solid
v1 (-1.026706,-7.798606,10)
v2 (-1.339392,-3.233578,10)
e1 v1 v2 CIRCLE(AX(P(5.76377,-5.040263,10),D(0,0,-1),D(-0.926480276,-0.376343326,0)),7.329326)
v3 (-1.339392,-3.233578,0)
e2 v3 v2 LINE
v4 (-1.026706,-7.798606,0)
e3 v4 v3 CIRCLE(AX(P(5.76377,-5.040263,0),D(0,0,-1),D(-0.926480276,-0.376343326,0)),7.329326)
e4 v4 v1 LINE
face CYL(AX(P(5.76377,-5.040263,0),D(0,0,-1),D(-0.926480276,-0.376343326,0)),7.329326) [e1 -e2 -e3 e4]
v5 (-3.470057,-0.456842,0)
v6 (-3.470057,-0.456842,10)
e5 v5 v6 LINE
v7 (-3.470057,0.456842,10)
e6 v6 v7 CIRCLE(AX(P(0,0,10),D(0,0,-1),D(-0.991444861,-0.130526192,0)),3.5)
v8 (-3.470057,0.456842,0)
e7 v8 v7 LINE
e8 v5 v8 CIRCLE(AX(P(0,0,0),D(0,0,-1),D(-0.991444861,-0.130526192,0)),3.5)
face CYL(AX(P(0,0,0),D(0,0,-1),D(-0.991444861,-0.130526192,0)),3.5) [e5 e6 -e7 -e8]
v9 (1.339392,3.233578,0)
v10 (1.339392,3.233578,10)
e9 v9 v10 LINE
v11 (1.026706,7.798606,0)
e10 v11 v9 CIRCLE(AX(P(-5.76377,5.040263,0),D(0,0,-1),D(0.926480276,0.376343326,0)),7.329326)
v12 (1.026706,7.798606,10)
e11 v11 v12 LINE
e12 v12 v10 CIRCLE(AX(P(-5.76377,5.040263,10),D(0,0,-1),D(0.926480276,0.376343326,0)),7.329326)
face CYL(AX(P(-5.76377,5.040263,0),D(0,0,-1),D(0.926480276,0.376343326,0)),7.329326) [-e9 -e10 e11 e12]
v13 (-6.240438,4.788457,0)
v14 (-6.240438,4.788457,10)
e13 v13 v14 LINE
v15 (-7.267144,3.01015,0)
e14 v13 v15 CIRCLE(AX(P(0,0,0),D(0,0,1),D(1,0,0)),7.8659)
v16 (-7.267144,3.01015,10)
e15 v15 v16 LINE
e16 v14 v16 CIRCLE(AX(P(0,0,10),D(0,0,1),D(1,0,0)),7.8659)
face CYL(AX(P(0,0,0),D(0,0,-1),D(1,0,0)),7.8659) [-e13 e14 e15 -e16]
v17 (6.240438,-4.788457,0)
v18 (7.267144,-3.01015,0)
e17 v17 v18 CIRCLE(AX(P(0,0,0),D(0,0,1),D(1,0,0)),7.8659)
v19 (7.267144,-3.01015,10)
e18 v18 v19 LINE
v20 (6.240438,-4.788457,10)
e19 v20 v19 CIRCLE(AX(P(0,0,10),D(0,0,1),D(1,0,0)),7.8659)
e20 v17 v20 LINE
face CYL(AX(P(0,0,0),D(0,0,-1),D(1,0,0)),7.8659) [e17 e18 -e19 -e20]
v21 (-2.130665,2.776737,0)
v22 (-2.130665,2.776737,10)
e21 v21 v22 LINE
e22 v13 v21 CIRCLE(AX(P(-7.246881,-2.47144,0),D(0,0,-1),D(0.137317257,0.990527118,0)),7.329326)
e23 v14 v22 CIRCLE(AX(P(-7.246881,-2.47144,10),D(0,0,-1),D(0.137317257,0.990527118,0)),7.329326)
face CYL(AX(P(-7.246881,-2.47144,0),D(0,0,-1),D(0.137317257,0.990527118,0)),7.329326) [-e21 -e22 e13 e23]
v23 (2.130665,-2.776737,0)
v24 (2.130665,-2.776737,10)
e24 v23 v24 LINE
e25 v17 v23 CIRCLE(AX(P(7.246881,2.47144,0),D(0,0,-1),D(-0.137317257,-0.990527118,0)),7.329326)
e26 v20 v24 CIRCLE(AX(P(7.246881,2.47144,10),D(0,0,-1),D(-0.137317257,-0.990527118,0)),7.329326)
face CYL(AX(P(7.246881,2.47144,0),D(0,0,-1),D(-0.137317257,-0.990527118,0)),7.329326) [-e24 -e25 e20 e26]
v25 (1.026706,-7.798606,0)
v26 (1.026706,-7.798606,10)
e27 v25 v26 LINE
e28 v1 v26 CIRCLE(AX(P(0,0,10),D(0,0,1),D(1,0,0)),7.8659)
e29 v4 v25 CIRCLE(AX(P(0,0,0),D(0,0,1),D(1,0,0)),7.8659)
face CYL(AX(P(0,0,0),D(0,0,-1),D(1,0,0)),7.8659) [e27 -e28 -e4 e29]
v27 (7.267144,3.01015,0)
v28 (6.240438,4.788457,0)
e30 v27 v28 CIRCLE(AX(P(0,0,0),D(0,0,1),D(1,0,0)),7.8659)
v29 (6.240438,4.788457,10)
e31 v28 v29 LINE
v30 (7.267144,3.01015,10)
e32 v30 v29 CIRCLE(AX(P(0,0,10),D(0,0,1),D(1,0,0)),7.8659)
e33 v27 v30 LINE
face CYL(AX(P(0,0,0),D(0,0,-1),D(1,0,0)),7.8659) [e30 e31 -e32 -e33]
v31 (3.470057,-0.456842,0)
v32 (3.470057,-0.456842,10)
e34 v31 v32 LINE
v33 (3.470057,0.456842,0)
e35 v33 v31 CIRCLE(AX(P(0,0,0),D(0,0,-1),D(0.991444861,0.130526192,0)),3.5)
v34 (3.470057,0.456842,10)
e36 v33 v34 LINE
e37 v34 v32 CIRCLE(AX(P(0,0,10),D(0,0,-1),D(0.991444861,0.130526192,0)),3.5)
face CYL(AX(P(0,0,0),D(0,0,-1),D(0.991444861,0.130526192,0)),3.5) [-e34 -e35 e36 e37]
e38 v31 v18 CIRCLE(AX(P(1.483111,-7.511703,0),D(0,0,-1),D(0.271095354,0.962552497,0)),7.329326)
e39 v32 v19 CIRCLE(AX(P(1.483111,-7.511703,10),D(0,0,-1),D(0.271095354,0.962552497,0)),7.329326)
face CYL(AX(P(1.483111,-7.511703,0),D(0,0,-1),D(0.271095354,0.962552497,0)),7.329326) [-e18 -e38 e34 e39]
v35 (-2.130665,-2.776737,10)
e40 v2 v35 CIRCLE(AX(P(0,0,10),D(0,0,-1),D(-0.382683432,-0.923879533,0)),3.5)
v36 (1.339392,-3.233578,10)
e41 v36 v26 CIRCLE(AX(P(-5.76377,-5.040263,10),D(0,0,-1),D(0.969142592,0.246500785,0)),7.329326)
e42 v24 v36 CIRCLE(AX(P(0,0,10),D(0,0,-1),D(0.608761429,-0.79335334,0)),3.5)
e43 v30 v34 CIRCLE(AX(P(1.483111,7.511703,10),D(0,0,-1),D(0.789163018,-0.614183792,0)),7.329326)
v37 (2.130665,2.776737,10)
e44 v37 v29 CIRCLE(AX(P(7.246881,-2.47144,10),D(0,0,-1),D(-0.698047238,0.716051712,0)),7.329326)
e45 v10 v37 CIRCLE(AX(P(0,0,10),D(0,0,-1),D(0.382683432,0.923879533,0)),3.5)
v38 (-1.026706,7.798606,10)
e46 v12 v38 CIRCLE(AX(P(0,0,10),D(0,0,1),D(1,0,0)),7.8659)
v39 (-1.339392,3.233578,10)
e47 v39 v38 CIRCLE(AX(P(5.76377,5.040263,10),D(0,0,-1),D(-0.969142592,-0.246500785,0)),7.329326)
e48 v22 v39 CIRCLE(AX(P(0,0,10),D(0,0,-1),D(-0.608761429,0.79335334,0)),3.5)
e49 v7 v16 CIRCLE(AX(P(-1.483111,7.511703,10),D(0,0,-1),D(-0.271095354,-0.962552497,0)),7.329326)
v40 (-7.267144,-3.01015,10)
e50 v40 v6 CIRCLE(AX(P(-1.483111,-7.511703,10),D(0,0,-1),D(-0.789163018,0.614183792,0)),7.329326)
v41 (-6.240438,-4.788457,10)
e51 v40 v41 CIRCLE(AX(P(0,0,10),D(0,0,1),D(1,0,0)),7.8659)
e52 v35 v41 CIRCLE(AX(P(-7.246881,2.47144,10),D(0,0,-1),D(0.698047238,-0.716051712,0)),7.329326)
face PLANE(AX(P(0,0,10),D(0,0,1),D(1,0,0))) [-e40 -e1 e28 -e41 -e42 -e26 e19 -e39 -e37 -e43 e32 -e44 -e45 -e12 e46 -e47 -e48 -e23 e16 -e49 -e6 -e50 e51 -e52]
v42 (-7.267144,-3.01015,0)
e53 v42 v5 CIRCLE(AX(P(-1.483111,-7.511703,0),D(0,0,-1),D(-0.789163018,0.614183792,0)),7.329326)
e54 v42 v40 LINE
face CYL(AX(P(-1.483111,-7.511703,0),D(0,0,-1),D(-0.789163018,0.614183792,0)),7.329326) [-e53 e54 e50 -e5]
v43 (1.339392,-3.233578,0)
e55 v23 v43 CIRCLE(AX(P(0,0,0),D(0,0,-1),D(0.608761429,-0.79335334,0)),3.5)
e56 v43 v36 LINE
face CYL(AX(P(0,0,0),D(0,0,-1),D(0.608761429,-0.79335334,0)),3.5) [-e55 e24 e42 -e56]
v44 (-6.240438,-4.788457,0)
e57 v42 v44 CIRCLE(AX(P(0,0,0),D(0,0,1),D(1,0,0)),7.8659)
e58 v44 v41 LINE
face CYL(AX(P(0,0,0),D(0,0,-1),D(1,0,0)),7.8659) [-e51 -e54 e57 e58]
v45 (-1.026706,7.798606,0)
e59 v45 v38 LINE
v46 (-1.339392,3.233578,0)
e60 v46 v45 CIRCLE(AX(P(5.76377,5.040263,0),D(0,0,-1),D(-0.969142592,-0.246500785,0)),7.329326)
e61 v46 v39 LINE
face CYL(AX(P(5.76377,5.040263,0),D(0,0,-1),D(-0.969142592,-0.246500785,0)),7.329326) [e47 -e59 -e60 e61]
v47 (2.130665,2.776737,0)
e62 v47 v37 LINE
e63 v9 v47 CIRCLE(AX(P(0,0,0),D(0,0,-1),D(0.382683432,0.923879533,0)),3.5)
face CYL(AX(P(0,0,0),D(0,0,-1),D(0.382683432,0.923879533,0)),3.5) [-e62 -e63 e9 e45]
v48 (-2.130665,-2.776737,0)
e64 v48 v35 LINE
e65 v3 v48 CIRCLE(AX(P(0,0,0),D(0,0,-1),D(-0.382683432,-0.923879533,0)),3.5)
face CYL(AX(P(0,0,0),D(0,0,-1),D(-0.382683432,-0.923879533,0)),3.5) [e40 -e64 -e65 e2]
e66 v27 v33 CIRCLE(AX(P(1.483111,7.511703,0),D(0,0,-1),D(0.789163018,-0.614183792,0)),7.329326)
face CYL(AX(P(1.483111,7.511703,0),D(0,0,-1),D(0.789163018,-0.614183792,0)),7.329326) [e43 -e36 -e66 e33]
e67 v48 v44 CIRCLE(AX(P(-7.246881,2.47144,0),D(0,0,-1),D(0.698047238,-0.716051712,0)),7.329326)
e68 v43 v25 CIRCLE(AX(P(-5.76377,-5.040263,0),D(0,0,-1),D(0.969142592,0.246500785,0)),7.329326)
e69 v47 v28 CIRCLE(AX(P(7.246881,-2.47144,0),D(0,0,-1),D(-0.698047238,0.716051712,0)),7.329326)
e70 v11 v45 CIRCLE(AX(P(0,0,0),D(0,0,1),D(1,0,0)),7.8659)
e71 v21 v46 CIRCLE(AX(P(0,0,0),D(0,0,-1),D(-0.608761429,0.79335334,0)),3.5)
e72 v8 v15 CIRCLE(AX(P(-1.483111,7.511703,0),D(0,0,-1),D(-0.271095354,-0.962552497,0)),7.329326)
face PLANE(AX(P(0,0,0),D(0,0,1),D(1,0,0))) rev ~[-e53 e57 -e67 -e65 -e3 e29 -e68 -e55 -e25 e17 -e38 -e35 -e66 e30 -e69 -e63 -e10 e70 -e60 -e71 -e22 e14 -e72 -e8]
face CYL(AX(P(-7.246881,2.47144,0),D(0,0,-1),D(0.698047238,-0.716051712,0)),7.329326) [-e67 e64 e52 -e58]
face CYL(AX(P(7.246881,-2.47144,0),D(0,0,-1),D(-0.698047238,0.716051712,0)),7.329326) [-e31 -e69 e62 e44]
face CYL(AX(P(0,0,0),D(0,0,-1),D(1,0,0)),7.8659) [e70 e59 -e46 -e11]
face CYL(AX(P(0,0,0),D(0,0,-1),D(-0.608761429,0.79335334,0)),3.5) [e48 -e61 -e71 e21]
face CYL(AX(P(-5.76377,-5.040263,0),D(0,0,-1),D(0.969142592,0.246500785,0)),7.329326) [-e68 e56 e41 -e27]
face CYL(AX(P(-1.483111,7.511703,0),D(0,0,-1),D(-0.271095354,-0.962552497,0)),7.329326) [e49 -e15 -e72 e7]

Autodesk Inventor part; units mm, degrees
sketch "Sketch1" plane through (0, 0, 0) normal (0, 0, 1) x (1, 0, 0)
  circle A0 centre (0, 0) radius 7.8659
  dimension "d0" = 15.7318
extrude "Extrusion1" add sketch "Sketch1" along normal blind 10
ref_plane "Work Plane2" through (0, 0, 5) normal (0, 0, 1) x (1, 0, 0)
sketch "Sketch2" plane through (0, 0, 0) normal (0, 0, -1) x (-1, 0, 0)
  circle A0 centre (0, 0) radius 7.8659 projected
  circle A1 centre (0, 0) radius 6
  dimension "d3" = 12
surface extrude "Pitch Diameter" sketch "Sketch2" against normal through all shown no curves A1
ref_plane "Work Plane8" through (0, 0, 0) normal (0.8660254, 0.5, 0) x (0, 0, 1)
ref_plane "Work Plane9" through (0, 0, 0) normal (1, 0, 0) x (0, 1, 0)
spur gear teeth "Spur Gear" teeth 6 pitch diameter 12 tip diameter 15.7318 root diameter 7 face width 10 start plane through (0, 0, 0) normal (0, 0, -1) x (-1, 0, 0)
equation "\"d0\" = da_da"
equation "\"d1\" = da_b"
equation "\"d3\" = da_d"
equation "\"da_da\" = 15.731825"
equation "\"da_b\" = 10"
equation "\"da_d\" = 12"
properties part number "Spur Gear1" material "Steel"
